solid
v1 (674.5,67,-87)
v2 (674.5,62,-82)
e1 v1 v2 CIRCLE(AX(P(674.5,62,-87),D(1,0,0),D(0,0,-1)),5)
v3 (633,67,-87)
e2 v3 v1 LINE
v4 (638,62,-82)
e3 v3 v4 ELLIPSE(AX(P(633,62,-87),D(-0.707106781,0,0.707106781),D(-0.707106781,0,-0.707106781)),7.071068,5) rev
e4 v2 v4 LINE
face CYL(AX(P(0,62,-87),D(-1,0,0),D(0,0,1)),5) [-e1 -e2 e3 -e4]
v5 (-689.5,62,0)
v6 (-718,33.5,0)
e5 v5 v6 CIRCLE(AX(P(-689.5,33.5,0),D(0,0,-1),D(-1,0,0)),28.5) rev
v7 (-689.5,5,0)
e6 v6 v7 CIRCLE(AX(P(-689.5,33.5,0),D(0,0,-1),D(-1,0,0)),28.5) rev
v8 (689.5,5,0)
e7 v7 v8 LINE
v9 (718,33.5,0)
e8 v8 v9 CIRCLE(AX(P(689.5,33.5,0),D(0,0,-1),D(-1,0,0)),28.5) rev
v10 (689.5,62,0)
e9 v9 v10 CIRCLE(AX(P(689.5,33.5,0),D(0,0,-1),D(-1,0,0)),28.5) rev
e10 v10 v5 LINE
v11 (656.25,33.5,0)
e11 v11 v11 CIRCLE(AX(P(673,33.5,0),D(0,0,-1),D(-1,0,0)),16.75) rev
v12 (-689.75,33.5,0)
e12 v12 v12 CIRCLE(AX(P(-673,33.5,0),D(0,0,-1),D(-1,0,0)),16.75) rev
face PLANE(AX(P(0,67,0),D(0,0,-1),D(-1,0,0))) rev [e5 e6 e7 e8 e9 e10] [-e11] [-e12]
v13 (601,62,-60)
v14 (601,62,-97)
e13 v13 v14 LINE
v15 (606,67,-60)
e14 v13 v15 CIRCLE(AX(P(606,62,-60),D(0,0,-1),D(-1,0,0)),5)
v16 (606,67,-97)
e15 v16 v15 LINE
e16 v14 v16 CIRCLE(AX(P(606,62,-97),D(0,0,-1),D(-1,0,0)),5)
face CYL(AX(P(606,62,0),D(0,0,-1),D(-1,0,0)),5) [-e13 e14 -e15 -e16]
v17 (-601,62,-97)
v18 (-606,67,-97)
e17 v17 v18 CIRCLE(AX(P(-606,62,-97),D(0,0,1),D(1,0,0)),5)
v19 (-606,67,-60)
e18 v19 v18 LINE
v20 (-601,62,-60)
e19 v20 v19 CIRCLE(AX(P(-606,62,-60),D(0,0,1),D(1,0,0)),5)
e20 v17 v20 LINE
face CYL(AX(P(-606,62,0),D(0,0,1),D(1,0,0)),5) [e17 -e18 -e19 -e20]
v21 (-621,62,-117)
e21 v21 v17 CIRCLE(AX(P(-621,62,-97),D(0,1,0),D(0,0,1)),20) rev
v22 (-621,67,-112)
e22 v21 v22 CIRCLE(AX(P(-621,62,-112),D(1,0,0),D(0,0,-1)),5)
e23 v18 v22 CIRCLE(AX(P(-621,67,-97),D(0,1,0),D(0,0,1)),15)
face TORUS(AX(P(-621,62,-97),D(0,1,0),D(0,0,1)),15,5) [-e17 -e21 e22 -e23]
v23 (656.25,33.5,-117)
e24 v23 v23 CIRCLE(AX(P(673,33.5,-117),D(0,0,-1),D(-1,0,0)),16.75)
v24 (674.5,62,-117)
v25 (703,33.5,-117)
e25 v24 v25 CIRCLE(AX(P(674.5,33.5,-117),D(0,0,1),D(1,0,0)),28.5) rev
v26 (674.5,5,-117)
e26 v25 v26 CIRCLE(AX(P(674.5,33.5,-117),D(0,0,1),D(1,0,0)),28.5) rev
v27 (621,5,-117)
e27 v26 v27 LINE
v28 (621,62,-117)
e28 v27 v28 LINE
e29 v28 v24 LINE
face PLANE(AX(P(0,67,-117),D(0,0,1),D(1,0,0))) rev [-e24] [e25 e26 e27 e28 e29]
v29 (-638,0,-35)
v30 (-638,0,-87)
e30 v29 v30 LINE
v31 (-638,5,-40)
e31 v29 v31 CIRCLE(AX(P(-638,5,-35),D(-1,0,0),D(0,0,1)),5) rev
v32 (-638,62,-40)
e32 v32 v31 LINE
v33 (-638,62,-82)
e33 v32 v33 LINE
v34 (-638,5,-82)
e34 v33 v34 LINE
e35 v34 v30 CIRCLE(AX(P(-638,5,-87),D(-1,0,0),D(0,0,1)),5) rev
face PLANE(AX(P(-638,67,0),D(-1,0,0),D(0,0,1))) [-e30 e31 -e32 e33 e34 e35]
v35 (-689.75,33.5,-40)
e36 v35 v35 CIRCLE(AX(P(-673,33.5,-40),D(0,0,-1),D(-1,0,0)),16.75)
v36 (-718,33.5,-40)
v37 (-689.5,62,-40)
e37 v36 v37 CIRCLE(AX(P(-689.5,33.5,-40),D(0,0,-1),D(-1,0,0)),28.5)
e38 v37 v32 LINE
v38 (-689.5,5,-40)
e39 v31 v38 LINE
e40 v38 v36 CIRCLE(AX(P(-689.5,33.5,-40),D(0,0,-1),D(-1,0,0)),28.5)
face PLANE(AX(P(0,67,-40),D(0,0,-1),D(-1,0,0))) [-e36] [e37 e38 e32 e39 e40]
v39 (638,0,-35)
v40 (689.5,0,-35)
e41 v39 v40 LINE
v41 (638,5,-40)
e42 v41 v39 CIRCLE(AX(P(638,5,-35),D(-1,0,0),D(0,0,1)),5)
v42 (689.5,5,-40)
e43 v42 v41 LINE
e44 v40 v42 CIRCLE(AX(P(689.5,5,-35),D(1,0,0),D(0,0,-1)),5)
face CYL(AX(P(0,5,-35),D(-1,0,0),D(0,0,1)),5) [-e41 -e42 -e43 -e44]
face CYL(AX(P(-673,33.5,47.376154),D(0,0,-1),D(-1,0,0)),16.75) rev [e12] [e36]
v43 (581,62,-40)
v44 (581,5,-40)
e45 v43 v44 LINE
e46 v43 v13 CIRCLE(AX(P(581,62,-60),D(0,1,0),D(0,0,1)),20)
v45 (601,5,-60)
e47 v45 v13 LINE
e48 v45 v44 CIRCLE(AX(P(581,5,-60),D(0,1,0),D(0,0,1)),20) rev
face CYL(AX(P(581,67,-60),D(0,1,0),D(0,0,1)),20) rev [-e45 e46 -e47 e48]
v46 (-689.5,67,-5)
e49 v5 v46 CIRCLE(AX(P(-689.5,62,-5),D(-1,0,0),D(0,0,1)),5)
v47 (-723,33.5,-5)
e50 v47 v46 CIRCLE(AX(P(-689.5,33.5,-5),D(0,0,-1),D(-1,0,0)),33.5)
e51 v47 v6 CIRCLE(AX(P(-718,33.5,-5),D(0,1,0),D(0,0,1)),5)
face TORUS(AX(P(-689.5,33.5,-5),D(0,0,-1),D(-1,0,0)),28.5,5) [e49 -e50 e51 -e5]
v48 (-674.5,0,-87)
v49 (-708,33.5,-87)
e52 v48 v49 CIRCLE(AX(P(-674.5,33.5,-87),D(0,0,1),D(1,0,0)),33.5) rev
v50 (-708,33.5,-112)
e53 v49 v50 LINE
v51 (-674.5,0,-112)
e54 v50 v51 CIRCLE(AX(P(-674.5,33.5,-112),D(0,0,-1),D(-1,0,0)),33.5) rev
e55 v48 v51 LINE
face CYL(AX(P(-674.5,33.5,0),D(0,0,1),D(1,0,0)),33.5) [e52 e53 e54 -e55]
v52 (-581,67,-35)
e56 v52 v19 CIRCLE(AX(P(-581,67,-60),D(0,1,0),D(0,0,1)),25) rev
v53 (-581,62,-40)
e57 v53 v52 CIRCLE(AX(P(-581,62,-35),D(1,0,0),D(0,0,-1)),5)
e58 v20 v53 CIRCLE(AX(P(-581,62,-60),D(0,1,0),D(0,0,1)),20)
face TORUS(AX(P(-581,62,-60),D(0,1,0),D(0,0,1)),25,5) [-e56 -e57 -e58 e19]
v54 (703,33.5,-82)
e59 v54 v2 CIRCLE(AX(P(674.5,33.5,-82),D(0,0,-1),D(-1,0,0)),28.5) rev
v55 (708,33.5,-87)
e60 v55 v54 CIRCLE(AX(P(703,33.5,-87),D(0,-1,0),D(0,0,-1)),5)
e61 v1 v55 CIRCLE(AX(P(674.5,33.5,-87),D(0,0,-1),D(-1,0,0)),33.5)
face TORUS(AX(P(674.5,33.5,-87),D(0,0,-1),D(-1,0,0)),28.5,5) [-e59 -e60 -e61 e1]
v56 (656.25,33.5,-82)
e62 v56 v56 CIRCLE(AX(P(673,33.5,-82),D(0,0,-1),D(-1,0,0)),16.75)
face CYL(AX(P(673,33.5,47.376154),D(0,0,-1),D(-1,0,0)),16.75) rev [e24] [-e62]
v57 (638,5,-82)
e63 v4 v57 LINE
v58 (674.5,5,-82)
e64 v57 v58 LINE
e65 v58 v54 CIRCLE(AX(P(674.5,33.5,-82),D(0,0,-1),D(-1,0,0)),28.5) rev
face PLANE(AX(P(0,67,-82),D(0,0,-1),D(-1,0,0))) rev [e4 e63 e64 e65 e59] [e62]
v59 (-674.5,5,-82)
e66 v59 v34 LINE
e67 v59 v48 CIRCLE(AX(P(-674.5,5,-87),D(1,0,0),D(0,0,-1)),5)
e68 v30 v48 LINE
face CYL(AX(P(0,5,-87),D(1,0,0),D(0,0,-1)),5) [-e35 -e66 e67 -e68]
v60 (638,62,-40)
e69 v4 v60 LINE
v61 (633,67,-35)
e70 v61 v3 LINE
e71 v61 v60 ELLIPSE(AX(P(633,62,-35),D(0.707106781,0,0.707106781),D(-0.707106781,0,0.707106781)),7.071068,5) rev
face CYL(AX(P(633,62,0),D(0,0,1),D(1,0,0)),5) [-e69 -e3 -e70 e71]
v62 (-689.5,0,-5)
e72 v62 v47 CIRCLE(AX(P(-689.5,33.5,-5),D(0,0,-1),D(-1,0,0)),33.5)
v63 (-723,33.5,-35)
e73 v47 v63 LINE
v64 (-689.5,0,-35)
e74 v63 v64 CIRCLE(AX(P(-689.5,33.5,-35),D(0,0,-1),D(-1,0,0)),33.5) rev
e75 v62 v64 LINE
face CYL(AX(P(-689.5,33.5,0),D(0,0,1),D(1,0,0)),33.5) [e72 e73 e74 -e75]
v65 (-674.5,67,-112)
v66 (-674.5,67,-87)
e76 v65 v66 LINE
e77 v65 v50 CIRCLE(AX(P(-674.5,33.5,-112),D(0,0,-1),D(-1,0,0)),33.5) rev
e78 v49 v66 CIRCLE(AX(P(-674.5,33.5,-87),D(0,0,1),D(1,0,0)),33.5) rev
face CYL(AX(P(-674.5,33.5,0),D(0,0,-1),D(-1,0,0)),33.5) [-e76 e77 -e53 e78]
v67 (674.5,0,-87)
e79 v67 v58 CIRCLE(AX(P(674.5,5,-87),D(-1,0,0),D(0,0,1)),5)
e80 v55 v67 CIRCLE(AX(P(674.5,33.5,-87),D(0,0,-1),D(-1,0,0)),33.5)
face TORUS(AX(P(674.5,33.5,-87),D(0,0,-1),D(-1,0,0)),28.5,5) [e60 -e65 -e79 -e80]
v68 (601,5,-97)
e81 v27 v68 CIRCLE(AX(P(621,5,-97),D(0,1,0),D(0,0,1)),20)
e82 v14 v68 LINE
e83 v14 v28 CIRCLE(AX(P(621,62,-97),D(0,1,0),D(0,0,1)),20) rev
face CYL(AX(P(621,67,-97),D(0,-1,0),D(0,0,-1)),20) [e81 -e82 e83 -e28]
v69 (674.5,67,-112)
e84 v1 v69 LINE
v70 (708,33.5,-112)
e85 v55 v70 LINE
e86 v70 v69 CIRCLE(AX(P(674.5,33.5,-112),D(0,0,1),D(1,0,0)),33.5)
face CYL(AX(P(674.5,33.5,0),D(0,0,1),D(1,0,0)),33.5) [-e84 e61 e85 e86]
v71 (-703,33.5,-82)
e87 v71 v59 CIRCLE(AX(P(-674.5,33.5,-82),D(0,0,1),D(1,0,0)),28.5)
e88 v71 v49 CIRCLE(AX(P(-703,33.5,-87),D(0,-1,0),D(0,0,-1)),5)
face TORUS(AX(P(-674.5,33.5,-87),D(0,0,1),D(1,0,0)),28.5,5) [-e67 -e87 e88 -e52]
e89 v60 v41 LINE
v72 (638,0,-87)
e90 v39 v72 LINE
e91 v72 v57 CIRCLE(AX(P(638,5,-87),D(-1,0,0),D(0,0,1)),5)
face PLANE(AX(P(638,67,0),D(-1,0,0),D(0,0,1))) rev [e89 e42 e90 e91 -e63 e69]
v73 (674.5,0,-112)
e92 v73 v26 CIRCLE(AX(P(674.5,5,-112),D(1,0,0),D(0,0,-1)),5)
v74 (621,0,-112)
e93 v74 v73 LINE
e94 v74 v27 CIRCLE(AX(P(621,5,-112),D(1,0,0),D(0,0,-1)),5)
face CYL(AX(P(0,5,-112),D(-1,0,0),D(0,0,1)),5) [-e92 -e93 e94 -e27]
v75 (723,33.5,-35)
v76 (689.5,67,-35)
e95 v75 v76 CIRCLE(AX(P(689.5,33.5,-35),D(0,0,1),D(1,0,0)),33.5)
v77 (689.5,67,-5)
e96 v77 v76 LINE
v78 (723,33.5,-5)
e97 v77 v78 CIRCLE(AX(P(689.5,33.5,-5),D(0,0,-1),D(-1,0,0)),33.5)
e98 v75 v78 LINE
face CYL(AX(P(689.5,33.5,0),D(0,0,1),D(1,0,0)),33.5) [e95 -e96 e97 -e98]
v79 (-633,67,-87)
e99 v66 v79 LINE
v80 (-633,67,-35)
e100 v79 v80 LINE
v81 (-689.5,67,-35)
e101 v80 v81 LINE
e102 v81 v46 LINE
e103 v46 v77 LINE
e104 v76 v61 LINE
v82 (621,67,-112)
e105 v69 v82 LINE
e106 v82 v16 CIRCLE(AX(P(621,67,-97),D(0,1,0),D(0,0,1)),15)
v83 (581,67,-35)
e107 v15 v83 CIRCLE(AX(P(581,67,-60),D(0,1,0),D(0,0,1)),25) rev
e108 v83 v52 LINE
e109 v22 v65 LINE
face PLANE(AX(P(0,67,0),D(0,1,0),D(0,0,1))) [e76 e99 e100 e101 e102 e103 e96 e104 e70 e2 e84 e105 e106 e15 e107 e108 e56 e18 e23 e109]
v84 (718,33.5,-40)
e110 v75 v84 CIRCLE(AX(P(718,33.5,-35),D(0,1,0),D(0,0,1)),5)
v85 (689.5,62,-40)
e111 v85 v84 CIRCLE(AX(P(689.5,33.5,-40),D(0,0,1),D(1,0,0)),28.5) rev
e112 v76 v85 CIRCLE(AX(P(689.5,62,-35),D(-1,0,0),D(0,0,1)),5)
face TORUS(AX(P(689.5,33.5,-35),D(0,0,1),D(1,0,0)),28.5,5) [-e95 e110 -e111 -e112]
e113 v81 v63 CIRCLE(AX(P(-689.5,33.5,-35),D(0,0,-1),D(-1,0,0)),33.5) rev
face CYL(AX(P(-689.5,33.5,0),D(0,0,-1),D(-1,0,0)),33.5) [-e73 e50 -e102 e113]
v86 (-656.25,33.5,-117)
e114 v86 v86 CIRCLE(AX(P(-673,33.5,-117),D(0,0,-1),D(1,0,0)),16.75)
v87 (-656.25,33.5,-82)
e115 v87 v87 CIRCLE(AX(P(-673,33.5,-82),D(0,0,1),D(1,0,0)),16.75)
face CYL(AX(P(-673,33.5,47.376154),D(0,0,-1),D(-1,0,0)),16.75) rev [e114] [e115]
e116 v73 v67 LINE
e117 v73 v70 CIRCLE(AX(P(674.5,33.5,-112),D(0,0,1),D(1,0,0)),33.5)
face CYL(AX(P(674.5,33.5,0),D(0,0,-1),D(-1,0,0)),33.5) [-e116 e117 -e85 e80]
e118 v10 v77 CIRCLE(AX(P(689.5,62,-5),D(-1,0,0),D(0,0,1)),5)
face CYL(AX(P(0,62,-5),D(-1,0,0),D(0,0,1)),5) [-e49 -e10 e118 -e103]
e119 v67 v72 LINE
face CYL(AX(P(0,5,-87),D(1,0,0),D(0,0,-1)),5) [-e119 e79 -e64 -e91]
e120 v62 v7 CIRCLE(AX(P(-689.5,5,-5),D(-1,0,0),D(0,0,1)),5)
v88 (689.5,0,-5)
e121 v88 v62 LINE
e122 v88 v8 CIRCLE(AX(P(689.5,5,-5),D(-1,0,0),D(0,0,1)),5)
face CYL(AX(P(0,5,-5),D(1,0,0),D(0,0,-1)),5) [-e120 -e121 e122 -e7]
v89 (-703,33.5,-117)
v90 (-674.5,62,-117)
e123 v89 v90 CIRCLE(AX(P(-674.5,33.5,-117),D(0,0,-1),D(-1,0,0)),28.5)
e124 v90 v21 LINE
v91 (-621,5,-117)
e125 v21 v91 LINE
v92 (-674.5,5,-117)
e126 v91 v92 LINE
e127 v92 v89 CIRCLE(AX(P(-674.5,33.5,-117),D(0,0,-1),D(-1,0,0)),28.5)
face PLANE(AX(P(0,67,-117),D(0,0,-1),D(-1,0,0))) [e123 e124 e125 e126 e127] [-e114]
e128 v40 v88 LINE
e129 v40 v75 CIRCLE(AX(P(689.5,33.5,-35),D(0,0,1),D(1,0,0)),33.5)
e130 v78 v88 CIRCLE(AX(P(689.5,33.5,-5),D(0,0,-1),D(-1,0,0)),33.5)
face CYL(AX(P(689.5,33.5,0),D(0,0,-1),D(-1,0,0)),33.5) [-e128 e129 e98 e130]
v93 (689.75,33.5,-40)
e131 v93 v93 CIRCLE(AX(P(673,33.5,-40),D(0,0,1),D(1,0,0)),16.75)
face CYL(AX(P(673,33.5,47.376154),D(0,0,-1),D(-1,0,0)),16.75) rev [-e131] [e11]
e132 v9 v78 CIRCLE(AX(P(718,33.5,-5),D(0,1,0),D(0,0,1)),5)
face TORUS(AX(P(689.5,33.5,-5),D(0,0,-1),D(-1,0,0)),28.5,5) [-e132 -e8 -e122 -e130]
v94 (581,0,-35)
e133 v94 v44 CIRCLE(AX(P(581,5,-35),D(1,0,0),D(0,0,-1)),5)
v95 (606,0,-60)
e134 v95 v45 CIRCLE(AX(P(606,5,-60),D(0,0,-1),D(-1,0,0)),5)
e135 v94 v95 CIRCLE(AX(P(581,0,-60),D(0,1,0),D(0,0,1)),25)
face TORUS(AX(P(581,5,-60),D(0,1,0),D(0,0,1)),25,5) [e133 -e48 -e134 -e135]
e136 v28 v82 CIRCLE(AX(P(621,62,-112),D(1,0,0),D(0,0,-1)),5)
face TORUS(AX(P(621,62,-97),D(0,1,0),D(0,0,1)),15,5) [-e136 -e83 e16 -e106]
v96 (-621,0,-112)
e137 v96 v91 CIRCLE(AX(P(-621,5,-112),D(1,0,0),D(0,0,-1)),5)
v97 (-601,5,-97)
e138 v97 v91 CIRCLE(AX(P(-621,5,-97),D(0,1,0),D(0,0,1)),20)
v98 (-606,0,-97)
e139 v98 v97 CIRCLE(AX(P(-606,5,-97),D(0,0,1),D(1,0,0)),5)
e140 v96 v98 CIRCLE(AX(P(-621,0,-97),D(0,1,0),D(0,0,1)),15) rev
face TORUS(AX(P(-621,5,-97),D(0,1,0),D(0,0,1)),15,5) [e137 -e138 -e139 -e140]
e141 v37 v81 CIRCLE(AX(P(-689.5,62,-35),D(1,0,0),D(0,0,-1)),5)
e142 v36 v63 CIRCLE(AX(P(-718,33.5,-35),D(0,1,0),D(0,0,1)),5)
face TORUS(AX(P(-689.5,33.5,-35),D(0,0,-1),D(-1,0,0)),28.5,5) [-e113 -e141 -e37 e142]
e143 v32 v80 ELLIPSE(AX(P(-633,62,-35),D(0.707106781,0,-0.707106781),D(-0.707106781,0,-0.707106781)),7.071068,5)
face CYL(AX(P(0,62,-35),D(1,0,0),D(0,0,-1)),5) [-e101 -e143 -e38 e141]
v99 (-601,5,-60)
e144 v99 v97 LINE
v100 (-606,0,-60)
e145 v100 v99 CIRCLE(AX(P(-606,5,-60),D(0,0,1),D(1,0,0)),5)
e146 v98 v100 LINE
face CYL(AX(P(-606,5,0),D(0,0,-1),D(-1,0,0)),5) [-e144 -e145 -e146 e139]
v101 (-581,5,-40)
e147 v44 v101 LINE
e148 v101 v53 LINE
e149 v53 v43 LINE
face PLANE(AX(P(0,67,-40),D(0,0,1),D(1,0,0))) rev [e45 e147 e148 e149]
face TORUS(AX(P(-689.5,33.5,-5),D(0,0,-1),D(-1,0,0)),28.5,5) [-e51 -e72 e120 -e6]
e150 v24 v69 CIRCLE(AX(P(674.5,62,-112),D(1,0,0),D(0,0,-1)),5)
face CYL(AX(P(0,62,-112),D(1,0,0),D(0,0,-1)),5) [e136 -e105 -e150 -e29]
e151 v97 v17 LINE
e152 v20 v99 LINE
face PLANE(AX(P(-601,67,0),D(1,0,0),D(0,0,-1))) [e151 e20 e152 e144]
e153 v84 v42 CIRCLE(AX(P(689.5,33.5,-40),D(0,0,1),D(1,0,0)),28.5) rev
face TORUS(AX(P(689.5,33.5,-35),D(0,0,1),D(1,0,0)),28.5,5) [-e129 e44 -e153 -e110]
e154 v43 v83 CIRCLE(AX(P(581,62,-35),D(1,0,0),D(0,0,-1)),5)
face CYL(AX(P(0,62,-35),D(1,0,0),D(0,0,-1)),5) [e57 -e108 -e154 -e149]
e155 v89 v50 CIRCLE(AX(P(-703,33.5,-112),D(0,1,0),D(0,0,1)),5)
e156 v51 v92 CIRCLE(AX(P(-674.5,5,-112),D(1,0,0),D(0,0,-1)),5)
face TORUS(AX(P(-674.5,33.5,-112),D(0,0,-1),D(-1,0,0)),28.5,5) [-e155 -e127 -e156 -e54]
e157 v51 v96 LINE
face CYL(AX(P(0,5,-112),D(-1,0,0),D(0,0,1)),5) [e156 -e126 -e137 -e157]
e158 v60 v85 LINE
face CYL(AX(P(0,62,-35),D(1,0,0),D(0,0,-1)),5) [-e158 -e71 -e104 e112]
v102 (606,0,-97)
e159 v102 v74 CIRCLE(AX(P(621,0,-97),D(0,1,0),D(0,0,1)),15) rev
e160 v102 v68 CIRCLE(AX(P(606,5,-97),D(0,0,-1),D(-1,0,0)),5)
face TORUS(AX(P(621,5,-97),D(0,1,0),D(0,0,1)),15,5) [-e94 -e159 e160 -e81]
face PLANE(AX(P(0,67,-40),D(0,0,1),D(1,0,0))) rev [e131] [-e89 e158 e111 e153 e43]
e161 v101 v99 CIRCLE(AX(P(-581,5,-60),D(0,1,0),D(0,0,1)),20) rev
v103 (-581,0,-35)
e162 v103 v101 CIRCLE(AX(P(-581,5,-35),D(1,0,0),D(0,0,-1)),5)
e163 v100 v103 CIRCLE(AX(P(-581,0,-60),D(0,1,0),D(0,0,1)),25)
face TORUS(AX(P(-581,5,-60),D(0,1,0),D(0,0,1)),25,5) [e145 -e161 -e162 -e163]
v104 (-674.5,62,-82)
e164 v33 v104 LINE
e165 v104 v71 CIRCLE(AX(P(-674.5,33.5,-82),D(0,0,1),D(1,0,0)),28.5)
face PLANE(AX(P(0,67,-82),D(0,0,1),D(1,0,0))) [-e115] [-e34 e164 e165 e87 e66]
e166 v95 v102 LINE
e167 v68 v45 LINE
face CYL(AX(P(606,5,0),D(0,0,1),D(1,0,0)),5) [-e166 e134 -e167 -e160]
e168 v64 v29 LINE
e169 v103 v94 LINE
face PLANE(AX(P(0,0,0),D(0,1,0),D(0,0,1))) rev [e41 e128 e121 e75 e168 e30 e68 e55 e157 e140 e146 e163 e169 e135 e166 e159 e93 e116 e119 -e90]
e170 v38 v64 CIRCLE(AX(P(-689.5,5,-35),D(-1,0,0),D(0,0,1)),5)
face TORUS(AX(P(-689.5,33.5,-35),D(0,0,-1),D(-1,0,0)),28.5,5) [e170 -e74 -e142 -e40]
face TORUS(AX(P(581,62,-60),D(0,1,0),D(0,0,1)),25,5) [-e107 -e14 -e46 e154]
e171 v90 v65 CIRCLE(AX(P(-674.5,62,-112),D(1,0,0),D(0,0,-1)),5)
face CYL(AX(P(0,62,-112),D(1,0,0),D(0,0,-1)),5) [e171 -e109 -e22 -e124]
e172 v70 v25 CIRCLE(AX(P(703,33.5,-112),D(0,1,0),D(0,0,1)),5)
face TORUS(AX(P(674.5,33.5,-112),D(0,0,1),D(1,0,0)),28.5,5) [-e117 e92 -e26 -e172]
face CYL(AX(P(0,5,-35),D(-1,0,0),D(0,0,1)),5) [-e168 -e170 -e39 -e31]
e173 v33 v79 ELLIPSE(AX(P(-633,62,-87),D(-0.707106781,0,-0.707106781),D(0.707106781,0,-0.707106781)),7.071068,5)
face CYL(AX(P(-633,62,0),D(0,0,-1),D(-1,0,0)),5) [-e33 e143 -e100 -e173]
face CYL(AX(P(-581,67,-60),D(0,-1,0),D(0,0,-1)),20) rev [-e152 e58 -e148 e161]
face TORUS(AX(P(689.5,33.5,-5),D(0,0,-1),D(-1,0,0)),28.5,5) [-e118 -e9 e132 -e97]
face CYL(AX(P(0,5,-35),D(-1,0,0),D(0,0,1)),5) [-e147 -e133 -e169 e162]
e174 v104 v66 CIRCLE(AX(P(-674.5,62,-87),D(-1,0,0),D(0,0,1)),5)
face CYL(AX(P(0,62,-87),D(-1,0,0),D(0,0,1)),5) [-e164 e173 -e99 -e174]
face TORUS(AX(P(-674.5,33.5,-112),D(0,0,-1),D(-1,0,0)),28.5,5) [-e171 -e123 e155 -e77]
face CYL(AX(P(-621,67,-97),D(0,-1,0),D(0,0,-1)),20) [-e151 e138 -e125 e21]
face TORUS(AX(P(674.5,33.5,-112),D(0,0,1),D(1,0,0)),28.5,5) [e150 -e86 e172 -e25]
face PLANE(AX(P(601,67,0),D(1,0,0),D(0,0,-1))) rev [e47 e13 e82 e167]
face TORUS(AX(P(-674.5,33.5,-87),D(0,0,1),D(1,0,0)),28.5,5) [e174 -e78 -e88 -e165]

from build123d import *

# Parameters (mm, degrees)
BOSS_EXTRUDE1_DEPTH = 67
CUT_EXTRUDE2_REACH  = 737.464
SKETCH3_R           = 16.75
RADYUS1_R           = 20
RADYUS2_R           = 33.5
RADYUS4_R           = 5


with BuildPart() as part:
    # Sketch2 → Boss-Extrude1 (new body)
    with BuildSketch(Plane(origin=(0, 0, 0), x_dir=(1, 0, 0), z_dir=(0, 1, 0))):
        Polygon((-723, 40), (-723, 0), (0, 0), (0, 40), (-601, 40), (-601, 117), (-708, 117), (-708, 82), (-638, 82), (-638, 40), align=None)
        Polygon((0, 40), (0, 0), (723, 0), (723, 40), (638, 40), (638, 82), (708, 82), (708, 117), (601, 117), (601, 40), align=None)
    extrude(amount=BOSS_EXTRUDE1_DEPTH)

    # Cut-Extrude2: up to this face of the body (flat: up to its plane)
    cut_extrude2_end = Plane(part.part.faces().sort_by_distance((0, 33.5, 0))[0])
    # Sketch3 → Cut-Extrude2 (cut, up to the picked face)
    with BuildSketch(Plane(origin=(0, 0, -117), x_dir=(-1, 0, 0), z_dir=(0, 0, -1)), mode=Mode.PRIVATE) as cut_extrude2_sk1:
        with Locations((-673, 33.5)):
            Circle(SKETCH3_R)
    cut_extrude2_tool1 = split(extrude(cut_extrude2_sk1.sketch, amount=-CUT_EXTRUDE2_REACH, mode=Mode.PRIVATE), bisect_by=cut_extrude2_end, keep=Keep.BOTH, mode=Mode.PRIVATE)
    # Sketch3 → Cut-Extrude2 (cut, up to the picked face)
    with BuildSketch(Plane(origin=(0, 0, -117), x_dir=(-1, 0, 0), z_dir=(0, 0, -1)), mode=Mode.PRIVATE) as cut_extrude2_sk2:
        with Locations((673, 33.5)):
            Circle(SKETCH3_R)
    cut_extrude2_tool2 = split(extrude(cut_extrude2_sk2.sketch, amount=-CUT_EXTRUDE2_REACH, mode=Mode.PRIVATE), bisect_by=cut_extrude2_end, keep=Keep.BOTH, mode=Mode.PRIVATE)
    add(cut_extrude2_tool1.solids().sort_by(Axis((673, 33.5, -117), (0, 0, 1)))[0], mode=Mode.SUBTRACT)
    add(cut_extrude2_tool2.solids().sort_by(Axis((-673, 33.5, -117), (0, 0, 1)))[0], mode=Mode.SUBTRACT)

    # Radyus1
    radyus1_edges = [part.edges().sort_by_distance(p)[0] for p in [
        (-601, 33.5, -117),
        (-601, 33.5, -40),
        (601, 33.5, -40),
        (601, 33.5, -117),
    ]]
    fillet(radyus1_edges, radius=RADYUS1_R)

    # Radyus2
    radyus2_edges = [part.edges().sort_by_distance(p)[0] for p in [
        (-723, 0, -20),
        (-723, 67, -20),
        (723, 0, -20),
        (723, 67, -20),
        (708, 67, -99.5),
        (708, 0, -99.5),
        (-708, 0, -99.5),
        (-708, 67, -99.5),
    ]]
    fillet(radyus2_edges, radius=RADYUS2_R - 0.0001)  # a hair under: the kernel refuses the full size

    # Radyus4
    radyus4_edges = [part.edges().sort_by_distance(p)[0] for p in [
        (647.75005, 67, -117),
        (-647.75005, 67, -117),
        (663.75005, 67, -40),
        (713.188106459, 57.188106459, -40),
        (713.188106459, 9.811893541, -40),
        (698.188106459, 9.811893541, -117),
        (698.188106459, 57.188106459, -117),
        (698.188106459, 9.811893541, -82),
        (698.188106459, 57.188106459, -82),
        (-698.188106459, 57.188106459, -117),
        (-698.188106459, 9.811893541, -117),
        (-698.188106459, 57.188106459, -82),
        (-698.188106459, 9.811893541, -82),
        (-656.25005, 0, -82),
        (638, 67, -61),
        (656.25005, 0, -82),
        (656.25005, 67, -82),
        (-656.25005, 67, -82),
        (-638, 67, -61),
        (601, 0, -78.5),
        (601, 67, -78.5),
        (-601, 0, -78.5),
        (0, 0, -40),
        (-606.857864376, 0, -111.142135624),
        (606.857864376, 0, -111.142135624),
        (0, 67, -40),
        (-601, 67, -78.5),
        (-606.857864376, 67, -111.142135624),
        (606.857864376, 67, -111.142135624),
        (595.142135624, 0, -45.857864376),
        (595.142135624, 67, -45.857864376),
        (-595.142135624, 0, -45.857864376),
        (-595.142135624, 67, -45.857864376),
        (647.75005, 0, -117),
        (663.75005, 0, -40),
        (0, 0, 0),
        (-663.75005, 0, -40),
        (-647.75005, 0, -117),
        (-663.75005, 67, -40),
        (-713.188106459, 57.188106459, -40),
        (-713.188106459, 9.811893541, -40),
        (0, 67, 0),
        (713.188106459, 57.188106459, 0),
        (713.188106459, 9.811893541, 0),
        (-713.188106459, 57.188106459, 0),
        (-713.188106459, 9.811893541, 0),
    ]]
    fillet(radyus4_edges, radius=RADYUS4_R)


solid = part.part
